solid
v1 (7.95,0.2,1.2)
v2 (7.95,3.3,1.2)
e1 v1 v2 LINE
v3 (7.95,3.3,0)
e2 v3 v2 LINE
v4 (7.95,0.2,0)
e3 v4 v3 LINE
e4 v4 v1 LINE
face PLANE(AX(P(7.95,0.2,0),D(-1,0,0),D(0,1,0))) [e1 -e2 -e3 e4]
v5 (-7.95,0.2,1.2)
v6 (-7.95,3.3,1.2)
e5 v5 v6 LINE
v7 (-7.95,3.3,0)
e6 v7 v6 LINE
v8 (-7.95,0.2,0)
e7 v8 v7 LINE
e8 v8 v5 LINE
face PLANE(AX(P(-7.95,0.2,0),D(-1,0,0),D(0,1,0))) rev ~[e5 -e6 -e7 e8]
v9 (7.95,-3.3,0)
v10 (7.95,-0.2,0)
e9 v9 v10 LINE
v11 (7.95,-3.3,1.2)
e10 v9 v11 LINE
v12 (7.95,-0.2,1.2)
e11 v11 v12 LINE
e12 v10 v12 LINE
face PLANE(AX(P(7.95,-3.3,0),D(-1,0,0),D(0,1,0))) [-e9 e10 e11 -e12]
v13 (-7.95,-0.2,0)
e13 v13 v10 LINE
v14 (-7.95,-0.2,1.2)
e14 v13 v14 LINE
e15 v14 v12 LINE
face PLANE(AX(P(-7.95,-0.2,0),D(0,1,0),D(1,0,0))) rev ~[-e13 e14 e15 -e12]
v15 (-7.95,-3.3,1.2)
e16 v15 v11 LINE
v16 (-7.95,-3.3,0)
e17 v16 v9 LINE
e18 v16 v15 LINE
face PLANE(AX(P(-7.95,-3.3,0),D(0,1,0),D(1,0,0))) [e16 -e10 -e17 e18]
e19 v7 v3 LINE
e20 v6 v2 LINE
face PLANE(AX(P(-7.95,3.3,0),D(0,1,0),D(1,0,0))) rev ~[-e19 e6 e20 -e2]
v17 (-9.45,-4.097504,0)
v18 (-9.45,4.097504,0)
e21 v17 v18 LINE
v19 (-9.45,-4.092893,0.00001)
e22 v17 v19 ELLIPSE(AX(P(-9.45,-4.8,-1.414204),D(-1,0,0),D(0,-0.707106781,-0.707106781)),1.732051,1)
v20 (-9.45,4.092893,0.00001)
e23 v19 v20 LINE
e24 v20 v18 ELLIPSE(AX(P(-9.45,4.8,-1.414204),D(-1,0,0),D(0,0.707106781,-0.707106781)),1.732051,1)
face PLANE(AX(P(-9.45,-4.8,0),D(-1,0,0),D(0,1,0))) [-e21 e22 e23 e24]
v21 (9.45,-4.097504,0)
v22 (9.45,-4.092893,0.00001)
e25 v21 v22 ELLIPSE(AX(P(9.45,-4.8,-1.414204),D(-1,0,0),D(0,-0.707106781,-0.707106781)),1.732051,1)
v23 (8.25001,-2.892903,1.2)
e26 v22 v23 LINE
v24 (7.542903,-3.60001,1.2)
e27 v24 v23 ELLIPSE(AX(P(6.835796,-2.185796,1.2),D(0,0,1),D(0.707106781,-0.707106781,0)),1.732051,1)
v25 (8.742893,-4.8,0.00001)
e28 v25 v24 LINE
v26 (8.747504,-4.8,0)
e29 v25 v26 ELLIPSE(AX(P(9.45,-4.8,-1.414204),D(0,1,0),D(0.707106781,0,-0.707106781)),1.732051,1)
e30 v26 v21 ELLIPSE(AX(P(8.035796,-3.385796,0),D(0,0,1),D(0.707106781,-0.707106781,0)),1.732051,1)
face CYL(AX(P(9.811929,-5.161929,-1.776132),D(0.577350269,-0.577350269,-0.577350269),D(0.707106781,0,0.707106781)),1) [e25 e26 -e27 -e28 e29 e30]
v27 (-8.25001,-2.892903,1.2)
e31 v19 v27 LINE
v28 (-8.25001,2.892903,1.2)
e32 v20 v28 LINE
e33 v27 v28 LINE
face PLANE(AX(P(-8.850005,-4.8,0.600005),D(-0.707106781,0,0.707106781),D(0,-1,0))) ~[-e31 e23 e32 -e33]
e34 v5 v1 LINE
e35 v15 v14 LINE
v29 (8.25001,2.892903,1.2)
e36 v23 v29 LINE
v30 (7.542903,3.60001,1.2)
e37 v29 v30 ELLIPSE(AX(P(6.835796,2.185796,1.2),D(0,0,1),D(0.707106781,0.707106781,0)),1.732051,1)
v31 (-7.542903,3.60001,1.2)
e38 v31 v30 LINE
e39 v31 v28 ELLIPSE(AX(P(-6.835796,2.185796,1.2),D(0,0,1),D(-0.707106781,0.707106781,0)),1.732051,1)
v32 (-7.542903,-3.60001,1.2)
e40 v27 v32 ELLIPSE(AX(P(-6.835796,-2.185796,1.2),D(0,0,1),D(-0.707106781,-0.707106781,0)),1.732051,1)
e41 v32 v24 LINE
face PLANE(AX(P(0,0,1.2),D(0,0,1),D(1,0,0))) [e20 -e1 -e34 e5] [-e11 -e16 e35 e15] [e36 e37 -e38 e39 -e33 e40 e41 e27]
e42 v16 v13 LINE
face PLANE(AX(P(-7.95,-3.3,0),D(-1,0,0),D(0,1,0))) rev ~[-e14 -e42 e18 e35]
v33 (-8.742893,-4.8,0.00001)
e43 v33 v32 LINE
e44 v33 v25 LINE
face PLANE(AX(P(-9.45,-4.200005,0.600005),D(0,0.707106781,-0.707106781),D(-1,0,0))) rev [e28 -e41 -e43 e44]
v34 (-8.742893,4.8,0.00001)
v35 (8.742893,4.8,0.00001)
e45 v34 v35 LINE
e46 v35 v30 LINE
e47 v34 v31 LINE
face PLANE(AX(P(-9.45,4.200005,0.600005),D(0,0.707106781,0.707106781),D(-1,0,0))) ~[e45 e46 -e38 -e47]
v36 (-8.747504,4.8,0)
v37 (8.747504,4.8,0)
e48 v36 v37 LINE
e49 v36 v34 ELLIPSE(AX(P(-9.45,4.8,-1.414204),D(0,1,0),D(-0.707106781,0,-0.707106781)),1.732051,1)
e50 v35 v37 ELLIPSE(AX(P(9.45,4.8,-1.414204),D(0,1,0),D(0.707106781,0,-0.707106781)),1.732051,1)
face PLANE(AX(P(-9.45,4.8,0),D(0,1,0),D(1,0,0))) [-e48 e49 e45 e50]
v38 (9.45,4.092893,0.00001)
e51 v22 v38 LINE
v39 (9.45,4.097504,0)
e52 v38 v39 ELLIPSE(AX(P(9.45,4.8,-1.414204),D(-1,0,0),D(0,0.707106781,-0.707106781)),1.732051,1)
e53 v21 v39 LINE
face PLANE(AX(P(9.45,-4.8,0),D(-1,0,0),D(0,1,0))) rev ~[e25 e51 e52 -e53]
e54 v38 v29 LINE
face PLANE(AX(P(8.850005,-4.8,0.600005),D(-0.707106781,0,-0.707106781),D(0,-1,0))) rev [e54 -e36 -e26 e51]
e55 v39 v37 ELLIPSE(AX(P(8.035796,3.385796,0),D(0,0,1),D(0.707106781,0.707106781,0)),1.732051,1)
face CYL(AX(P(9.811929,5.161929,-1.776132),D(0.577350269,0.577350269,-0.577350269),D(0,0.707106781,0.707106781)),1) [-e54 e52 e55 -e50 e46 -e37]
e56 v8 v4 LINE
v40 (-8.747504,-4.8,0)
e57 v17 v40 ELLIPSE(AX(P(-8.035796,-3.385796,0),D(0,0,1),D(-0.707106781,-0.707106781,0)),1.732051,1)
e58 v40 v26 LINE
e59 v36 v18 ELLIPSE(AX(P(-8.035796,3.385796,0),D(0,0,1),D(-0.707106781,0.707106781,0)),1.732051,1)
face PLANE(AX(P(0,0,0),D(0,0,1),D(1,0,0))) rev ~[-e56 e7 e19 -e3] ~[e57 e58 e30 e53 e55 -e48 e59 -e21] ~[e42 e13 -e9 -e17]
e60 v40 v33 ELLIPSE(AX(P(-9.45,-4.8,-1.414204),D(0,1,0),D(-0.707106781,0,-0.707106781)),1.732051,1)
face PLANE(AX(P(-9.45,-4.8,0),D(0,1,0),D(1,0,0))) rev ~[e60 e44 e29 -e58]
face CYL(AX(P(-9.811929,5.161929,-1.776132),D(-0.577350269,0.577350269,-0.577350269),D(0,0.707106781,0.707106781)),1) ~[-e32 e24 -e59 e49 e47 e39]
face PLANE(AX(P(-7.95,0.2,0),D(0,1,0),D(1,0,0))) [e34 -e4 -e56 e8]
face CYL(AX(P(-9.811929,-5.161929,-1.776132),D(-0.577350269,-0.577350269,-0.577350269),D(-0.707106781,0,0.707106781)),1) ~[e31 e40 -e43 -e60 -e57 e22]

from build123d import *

# Parameters (mm, degrees)
F0_W        = 18.9
F0_H        = 9.6
F0_W_2      = 15.9
F0_H_2      = 3.1
F1_DEPTH    = 1.2
F2_SIZE     = 1.19999
F3_T1_DEPTH = 4.9651949945
F3_T3_DEPTH = 4.9651949945
F3_T5_DEPTH = 4.9651949945
F3_T7_DEPTH = 4.9651949945


# Not quite as in the source:
# - a fillet or chamfer that OpenCascade refuses, or shapes differently, is made with other operations: its cross-section is extruded or revolved along the edge and cut away or added
# - a fillet or chamfer is up to 0.001 mm smaller than in the source, because OpenCascade refuses the exact size


with BuildPart() as f1:
    # F0 (on Top) → F1 (new body)
    with BuildSketch(Plane.XY):
        Rectangle(F0_W, F0_H)
        with Locations((0, -1.75)):
            Rectangle(F0_W_2, F0_H_2, mode=Mode.SUBTRACT)
        with Locations((0, 1.75)):
            Rectangle(F0_W_2, F0_H_2, mode=Mode.SUBTRACT)
    extrude(amount=F1_DEPTH)

    # F2 (size 1.2 in the source; OpenCascade refuses exactly that, so slightly less here)
    f2_edges = [f1.edges().sort_by_distance(p)[0] for p in [
        (0, -4.8, 1.2),
        (-9.45, 0, 1.2),
        (9.45, 0, 1.2),
        (0, 4.8, 1.2),
    ]]
    chamfer(f2_edges, length=F2_SIZE)

    # F3: fillet of radius 1 on 4 edges, made by hand

    # F3_s2 → F3_t1 (cut)
    with BuildSketch(Plane(origin=(-5.58333, -5.58333, -5.58333), x_dir=(-0.7071067812, 0.7071067812, 0), z_dir=(0.5773502692, 0.5773502692, 0.5773502692))):
        with BuildLine():
            ThreePointArc((3.7880465325, 5.5288711695), (3.2880465325, 5.6628457657), (2.7880465325, 5.5288711695))
            Line((2.7880465325, 5.5288711695), (3.2880465325, 5.8175463041))
            Line((3.2880465325, 5.8175463041), (3.7880465325, 5.5288711695))
        make_face()
    extrude(amount=F3_T1_DEPTH, mode=Mode.SUBTRACT)

    # F3_s4 → F3_t3 (cut)
    with BuildSketch(Plane(origin=(5.58333, -5.58333, -5.58333), x_dir=(-0.7071067812, -0.7071067812, 0), z_dir=(-0.5773502692, 0.5773502692, 0.5773502692))):
        with BuildLine():
            ThreePointArc((-3.7880465325, 5.5288711695), (-3.2880465325, 5.6628457657), (-2.7880465325, 5.5288711695))
            Line((-2.7880465325, 5.5288711695), (-3.2880465325, 5.8175463041))
            Line((-3.2880465325, 5.8175463041), (-3.7880465325, 5.5288711695))
        make_face()
    extrude(amount=F3_T3_DEPTH, mode=Mode.SUBTRACT)

    # F3_s6 → F3_t5 (cut)
    with BuildSketch(Plane(origin=(5.58333, 5.58333, -5.58333), x_dir=(0.7071067812, -0.7071067812, 0), z_dir=(-0.5773502692, -0.5773502692, 0.5773502692))):
        with BuildLine():
            ThreePointArc((2.7880465325, 5.5288711695), (3.2880465325, 5.6628457657), (3.7880465325, 5.5288711695))
            Line((3.7880465325, 5.5288711695), (3.2880465325, 5.8175463041))
            Line((3.2880465325, 5.8175463041), (2.7880465325, 5.5288711695))
        make_face()
    extrude(amount=F3_T5_DEPTH, mode=Mode.SUBTRACT)

    # F3_s8 → F3_t7 (cut)
    with BuildSketch(Plane(origin=(-5.58333, 5.58333, -5.58333), x_dir=(0.7071067812, 0.7071067812, 0), z_dir=(0.5773502692, -0.5773502692, 0.5773502692))):
        with BuildLine():
            ThreePointArc((-2.7880465325, 5.5288711695), (-3.2880465325, 5.6628457657), (-3.7880465325, 5.5288711695))
            Line((-3.7880465325, 5.5288711695), (-3.2880465325, 5.8175463041))
            Line((-3.2880465325, 5.8175463041), (-2.7880465325, 5.5288711695))
        make_face()
    extrude(amount=F3_T7_DEPTH, mode=Mode.SUBTRACT)


solid = f1.part
